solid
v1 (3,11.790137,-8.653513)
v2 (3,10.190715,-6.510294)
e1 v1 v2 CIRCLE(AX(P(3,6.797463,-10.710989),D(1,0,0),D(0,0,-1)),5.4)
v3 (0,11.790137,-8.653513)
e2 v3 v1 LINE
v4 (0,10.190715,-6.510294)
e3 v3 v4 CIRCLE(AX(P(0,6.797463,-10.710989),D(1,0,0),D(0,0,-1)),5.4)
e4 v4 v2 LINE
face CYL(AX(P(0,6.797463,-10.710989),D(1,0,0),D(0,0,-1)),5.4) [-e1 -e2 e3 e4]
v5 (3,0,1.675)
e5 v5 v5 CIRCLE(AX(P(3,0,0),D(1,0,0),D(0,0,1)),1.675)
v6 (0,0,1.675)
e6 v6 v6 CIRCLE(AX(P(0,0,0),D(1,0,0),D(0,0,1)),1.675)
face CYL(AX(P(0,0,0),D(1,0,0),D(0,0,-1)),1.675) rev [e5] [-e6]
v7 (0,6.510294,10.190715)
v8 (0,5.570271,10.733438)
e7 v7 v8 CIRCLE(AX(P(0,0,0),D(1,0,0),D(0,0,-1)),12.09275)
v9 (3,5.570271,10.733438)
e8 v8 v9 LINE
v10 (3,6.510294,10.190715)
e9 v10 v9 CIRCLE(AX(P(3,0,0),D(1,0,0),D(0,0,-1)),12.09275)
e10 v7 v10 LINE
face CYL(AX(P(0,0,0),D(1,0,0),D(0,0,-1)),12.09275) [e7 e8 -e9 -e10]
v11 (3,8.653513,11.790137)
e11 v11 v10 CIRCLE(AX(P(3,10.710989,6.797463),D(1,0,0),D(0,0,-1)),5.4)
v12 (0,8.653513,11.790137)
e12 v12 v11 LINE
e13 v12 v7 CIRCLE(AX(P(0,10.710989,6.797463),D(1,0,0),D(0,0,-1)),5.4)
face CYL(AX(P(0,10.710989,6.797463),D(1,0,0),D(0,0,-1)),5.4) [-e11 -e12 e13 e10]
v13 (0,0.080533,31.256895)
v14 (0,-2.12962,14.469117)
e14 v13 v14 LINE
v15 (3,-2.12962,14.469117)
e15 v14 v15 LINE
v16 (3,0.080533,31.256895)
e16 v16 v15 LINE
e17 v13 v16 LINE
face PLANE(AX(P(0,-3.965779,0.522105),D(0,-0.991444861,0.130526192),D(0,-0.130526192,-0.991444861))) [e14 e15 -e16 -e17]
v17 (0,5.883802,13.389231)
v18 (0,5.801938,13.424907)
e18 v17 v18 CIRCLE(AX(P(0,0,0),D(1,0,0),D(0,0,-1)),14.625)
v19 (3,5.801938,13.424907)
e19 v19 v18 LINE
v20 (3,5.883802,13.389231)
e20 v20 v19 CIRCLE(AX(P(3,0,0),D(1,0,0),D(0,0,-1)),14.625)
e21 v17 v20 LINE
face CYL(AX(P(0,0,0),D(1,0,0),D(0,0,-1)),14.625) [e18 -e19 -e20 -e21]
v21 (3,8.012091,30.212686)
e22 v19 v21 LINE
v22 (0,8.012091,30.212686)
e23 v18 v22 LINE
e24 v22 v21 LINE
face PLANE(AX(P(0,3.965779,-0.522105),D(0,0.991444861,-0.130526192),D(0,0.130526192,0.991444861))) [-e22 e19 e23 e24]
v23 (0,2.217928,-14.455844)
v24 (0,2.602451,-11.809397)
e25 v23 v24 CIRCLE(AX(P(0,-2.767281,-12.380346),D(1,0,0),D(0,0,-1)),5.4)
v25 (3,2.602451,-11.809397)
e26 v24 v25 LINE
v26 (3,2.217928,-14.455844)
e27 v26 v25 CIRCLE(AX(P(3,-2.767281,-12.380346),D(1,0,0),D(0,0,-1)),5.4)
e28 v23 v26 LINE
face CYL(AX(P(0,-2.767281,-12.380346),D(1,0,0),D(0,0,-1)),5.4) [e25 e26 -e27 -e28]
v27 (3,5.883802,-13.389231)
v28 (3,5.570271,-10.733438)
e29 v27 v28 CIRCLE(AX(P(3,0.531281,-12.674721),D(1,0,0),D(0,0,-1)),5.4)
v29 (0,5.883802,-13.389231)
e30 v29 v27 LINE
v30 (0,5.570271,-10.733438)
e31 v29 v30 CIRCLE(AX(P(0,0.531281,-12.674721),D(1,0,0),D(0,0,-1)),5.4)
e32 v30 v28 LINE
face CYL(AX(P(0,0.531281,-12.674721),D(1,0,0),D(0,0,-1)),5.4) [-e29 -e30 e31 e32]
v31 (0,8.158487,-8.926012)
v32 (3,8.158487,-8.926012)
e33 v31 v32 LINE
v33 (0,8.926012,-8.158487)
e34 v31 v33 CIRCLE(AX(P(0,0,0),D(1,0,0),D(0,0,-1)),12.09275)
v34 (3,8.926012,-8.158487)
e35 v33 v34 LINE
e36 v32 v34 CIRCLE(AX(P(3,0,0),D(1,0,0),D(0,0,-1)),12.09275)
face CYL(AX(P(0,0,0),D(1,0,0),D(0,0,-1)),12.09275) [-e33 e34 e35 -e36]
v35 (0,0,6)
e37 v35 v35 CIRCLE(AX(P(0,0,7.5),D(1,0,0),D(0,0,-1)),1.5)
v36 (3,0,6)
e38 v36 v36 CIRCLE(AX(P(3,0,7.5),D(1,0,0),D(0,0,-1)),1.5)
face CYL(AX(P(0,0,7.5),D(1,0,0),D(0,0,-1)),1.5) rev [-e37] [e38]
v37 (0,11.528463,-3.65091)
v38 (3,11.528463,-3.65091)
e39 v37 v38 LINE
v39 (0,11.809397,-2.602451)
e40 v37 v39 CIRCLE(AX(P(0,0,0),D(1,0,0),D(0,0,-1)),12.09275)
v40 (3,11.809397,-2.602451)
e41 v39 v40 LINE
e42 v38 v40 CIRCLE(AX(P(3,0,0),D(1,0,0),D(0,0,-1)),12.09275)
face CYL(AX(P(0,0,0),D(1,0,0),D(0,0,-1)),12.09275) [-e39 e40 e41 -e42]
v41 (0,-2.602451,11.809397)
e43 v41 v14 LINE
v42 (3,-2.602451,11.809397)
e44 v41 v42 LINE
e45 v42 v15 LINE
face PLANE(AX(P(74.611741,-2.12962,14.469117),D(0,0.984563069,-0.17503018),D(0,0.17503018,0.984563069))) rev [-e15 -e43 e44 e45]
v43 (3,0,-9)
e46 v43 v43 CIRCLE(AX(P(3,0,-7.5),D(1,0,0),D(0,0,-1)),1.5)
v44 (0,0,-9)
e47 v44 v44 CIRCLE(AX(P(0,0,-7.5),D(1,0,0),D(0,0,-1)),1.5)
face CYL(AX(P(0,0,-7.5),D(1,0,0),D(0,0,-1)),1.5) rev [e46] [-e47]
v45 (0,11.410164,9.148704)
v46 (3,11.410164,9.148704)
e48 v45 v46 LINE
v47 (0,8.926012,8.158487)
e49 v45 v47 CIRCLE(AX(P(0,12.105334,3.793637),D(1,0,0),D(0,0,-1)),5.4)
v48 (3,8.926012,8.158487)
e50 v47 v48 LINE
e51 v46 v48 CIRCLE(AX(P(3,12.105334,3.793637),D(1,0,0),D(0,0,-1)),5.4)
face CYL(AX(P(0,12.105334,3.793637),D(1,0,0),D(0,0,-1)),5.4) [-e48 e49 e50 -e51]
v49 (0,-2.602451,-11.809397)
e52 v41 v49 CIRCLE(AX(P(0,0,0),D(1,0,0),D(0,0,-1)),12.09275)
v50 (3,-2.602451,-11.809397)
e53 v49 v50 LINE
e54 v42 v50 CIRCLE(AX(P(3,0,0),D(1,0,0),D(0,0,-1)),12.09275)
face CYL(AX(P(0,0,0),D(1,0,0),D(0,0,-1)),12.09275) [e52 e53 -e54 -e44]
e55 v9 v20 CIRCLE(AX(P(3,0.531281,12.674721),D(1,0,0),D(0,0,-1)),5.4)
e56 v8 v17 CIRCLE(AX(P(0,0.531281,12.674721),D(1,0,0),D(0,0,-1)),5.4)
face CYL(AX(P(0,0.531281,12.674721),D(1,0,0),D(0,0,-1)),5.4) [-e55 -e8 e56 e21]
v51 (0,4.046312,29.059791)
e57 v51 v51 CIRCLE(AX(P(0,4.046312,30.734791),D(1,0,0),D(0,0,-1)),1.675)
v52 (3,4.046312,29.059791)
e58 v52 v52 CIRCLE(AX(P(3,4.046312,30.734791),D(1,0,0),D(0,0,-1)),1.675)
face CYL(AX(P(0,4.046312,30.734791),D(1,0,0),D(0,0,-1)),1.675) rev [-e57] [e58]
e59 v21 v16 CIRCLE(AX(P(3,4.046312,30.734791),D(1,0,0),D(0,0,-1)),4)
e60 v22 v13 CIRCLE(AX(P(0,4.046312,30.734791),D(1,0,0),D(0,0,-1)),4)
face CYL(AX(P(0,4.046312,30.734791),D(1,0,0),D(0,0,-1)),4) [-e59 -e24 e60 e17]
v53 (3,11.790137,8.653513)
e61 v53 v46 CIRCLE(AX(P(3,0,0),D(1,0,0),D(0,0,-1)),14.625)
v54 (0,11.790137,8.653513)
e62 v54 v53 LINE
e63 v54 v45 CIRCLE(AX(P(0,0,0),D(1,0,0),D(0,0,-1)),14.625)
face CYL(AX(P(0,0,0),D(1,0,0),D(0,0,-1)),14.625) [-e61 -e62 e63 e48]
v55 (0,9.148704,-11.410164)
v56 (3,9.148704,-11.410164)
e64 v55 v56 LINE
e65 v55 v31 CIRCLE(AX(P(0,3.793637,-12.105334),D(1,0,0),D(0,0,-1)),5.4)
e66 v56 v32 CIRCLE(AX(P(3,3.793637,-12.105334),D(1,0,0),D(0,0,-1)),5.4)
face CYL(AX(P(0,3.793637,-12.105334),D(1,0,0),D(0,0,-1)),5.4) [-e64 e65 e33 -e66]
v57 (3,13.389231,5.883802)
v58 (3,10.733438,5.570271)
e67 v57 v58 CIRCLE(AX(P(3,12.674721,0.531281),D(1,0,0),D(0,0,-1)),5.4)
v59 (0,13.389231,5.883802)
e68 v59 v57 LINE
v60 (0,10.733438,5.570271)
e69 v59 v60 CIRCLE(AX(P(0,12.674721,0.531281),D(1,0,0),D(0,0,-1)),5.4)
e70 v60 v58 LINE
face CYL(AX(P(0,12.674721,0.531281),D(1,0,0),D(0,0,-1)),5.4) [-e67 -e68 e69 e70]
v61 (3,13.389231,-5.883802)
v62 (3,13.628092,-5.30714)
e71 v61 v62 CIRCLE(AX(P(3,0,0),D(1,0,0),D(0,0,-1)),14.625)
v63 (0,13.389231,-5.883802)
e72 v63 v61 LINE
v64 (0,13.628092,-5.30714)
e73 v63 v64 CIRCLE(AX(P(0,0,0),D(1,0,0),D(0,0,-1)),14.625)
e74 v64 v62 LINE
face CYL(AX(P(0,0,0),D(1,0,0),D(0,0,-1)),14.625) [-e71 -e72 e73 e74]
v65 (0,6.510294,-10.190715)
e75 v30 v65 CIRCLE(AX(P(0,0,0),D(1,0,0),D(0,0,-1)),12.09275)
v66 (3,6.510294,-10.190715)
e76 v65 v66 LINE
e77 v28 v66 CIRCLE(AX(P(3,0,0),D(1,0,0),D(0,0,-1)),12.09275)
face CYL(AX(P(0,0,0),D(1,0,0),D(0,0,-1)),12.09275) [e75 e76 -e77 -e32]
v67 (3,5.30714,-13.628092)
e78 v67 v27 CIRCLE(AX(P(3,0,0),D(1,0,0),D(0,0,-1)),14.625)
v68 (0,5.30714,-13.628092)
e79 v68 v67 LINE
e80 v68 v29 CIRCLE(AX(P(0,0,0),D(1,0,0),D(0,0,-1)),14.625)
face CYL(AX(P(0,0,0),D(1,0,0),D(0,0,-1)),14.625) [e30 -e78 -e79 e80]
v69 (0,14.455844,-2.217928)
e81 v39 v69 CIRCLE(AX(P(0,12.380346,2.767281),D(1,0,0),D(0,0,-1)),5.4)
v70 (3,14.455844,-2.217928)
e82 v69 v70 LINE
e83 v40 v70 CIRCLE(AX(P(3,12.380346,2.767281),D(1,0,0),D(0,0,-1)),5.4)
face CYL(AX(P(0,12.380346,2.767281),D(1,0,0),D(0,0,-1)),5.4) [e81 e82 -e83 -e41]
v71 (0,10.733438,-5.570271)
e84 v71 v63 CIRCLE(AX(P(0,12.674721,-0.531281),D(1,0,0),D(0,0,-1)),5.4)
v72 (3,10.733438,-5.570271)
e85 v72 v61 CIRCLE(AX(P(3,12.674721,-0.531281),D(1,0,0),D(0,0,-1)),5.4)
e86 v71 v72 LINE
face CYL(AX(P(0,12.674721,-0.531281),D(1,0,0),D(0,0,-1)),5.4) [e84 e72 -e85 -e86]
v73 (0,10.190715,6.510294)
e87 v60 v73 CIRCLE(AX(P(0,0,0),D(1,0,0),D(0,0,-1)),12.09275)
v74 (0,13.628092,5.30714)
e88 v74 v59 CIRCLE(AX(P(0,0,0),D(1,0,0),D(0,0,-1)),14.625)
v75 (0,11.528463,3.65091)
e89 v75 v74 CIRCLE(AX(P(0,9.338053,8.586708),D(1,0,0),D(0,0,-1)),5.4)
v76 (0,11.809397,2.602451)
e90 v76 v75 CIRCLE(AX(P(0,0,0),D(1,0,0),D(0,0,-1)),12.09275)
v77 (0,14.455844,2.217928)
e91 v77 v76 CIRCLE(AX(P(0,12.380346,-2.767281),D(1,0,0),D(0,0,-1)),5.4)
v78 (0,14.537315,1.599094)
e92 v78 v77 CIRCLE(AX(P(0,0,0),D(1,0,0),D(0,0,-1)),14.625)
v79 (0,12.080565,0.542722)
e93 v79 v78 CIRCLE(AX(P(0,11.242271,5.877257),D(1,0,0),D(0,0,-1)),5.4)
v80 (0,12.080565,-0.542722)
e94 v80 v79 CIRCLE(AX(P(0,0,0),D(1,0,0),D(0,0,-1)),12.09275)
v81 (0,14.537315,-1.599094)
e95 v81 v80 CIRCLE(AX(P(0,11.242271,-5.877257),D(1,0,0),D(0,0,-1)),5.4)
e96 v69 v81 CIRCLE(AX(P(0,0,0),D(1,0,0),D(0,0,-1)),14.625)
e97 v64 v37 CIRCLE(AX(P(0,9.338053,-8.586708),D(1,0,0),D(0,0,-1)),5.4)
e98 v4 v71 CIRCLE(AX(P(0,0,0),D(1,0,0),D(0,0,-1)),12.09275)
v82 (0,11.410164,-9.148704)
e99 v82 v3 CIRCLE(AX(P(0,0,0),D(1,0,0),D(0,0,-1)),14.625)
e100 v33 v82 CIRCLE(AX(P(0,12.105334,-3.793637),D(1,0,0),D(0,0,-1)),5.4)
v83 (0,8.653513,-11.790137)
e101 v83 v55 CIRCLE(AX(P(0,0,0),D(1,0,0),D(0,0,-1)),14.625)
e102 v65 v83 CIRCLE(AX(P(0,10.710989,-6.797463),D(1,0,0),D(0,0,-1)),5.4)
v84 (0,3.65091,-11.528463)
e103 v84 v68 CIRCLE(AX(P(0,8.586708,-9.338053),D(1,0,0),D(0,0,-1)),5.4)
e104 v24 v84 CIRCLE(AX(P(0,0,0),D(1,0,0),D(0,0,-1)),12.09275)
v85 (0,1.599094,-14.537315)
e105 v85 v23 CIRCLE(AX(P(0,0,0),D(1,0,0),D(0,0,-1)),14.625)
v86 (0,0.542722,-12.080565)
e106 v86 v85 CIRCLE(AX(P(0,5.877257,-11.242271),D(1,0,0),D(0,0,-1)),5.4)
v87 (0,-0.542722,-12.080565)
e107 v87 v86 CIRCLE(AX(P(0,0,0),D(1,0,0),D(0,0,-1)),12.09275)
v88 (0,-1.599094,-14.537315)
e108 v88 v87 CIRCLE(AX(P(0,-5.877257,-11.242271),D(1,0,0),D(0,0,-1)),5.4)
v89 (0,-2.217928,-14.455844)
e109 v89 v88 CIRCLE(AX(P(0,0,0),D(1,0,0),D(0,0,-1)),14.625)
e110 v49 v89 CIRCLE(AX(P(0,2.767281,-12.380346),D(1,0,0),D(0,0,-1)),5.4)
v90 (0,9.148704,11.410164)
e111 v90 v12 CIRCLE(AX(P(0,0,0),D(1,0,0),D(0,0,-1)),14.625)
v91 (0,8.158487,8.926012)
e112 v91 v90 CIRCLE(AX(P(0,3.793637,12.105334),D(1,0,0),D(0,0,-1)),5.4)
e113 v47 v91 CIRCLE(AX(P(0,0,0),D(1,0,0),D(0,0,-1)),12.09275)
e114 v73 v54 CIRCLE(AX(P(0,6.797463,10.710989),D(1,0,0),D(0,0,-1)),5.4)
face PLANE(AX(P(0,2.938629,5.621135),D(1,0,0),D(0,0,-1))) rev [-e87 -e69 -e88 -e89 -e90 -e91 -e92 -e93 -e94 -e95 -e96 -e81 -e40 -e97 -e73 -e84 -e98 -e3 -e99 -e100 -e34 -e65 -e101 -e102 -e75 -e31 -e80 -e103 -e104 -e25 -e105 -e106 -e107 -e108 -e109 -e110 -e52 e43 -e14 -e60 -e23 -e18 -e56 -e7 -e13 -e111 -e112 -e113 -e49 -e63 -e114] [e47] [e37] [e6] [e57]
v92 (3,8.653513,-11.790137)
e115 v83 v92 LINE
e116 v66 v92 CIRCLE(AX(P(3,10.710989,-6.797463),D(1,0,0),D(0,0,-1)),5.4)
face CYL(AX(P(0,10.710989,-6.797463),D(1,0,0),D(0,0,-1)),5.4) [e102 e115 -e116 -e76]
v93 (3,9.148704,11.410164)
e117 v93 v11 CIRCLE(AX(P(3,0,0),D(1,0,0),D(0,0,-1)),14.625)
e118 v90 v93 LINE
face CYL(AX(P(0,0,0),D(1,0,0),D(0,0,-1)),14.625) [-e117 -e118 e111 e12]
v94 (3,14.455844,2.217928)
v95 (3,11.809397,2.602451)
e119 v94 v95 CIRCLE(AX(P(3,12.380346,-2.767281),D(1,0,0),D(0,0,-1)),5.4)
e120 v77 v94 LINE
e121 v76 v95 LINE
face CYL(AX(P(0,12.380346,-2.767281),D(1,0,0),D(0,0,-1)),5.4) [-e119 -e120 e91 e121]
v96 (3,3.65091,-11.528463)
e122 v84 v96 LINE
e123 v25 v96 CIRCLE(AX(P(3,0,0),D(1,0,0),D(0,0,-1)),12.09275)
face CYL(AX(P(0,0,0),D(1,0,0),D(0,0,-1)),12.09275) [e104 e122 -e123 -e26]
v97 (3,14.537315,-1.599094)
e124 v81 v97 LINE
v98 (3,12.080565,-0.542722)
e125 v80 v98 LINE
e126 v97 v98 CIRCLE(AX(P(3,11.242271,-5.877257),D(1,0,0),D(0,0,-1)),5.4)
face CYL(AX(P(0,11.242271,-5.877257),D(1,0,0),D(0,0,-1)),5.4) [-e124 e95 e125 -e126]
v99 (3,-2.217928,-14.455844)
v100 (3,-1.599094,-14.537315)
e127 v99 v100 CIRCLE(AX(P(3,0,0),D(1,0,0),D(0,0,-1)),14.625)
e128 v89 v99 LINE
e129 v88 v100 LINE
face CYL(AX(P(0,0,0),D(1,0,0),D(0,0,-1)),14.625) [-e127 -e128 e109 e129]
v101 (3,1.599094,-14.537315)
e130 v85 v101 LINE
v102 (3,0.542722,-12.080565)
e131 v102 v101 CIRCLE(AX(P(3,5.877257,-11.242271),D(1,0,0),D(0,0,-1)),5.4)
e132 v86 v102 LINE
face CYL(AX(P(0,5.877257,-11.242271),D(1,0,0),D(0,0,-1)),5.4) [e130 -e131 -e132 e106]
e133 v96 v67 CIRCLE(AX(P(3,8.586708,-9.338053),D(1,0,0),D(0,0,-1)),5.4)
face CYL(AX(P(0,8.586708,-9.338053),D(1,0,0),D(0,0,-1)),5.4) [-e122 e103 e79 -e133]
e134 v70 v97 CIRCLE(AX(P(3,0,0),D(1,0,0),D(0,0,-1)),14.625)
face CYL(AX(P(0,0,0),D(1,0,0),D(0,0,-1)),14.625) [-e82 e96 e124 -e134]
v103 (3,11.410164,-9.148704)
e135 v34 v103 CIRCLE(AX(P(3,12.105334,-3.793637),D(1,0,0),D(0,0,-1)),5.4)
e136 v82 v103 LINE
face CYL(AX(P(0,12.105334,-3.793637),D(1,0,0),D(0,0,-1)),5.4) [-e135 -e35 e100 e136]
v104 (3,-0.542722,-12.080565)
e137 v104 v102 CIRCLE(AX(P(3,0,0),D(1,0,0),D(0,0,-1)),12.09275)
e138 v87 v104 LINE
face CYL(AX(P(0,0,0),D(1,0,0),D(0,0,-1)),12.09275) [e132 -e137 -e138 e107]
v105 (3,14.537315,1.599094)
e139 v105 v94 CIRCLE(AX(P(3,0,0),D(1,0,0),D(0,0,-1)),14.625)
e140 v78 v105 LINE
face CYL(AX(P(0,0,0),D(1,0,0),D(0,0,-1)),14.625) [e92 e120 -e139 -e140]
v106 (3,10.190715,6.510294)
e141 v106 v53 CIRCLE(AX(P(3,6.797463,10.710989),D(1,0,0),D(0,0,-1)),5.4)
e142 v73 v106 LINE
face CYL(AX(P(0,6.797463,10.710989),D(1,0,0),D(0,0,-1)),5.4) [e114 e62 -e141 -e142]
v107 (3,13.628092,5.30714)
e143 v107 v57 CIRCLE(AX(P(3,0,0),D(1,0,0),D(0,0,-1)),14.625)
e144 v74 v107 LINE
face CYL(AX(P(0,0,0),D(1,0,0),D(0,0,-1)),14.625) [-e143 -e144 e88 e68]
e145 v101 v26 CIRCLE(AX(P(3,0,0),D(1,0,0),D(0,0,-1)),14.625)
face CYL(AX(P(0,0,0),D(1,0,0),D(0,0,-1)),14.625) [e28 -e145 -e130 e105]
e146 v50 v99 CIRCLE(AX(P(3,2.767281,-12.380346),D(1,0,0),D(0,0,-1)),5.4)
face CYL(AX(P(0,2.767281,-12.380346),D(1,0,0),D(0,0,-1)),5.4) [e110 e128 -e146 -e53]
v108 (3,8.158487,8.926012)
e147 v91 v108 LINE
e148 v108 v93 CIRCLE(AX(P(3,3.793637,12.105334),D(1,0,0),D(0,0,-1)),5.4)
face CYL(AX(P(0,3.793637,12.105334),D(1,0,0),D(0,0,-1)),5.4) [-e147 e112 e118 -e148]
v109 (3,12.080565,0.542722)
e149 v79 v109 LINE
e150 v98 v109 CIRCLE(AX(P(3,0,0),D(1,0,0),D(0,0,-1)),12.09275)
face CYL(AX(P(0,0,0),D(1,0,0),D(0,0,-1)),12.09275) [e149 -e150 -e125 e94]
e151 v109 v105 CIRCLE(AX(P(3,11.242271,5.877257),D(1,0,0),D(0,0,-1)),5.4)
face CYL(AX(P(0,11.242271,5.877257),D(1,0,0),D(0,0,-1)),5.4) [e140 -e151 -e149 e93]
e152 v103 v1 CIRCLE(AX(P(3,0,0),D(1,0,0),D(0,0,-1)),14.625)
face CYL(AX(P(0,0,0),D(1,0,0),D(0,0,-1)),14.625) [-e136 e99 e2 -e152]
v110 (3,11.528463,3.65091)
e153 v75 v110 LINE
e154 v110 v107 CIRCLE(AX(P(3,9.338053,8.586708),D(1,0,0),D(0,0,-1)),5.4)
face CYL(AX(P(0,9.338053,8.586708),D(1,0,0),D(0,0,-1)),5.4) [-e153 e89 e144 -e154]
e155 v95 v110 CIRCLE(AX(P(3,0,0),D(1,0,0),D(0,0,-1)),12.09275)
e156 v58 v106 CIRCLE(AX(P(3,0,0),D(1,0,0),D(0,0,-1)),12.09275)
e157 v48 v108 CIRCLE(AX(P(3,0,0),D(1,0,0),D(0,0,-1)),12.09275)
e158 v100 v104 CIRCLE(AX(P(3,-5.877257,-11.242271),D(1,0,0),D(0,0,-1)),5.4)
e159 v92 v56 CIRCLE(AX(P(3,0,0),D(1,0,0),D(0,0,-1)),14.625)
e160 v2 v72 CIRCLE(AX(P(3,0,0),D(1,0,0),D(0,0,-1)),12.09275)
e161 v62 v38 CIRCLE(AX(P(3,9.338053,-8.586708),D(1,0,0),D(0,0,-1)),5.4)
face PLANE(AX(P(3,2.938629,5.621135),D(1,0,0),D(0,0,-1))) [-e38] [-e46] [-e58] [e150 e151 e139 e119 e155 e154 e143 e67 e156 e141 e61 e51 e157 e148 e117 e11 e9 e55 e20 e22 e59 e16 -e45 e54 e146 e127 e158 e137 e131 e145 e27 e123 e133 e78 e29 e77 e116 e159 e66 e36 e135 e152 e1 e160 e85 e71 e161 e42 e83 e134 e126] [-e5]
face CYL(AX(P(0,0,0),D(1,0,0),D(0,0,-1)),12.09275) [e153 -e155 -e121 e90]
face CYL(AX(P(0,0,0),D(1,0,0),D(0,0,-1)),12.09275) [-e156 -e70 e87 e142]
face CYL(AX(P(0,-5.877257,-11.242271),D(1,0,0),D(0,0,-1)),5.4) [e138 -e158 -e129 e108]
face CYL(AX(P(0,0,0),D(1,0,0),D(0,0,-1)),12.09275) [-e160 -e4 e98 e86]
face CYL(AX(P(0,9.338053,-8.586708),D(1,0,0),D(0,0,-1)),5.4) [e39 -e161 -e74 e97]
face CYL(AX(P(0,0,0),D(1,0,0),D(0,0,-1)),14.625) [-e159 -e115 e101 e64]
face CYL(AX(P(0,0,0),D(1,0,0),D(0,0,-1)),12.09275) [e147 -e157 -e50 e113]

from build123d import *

# Parameters (mm, degrees)
SKETCH1_R           = 1.675
BOSS_EXTRUDE1_DEPTH = 3
SKETCH2_R           = 1.675
BOSS_EXTRUDE2_DEPTH = 3
CUT_EXTRUDE1_START  = -3
CUT_EXTRUDE1_DEPTH  = 3
SKETCH4_R           = 1.5
CUT_EXTRUDE2_DEPTH  = 38.773525245


# Read off the part's stored shape, not the designer's step: Cut-Extrude1
with BuildPart() as part:
    # Sketch1 → Boss-Extrude1 (new body)
    with BuildSketch(Plane(origin=(3, 0, 0), x_dir=(0, 0, -1), z_dir=(1, 0, 0))):
        with BuildLine():
            ThreePointArc((-14.537314892, 1.599093719), (-13.375367565, 0.916420874), (-12.080565177, 0.542722358))
            ThreePointArc((-12.080565177, 0.542722358), (-12.09275, 0), (-12.080565177, -0.542722358))
            ThreePointArc((-12.080565177, -0.542722358), (-13.375367565, -0.916420874), (-14.537314892, -1.599093719))
            ThreePointArc((-14.537314892, -1.599093719), (-14.499881098, -1.908945561), (-14.455843809, -2.217928037))
            ThreePointArc((-14.455843809, -2.217928037), (-13.156800143, -2.576605271), (-11.809396783, -2.602450802))
            ThreePointArc((-11.809396783, -2.602450802), (-11.680699536, -3.129834008), (-11.528463019, -3.650909885))
            ThreePointArc((-11.528463019, -3.650909885), (-12.682425791, -4.346994451), (-13.62809199, -5.30713988))
            ThreePointArc((-13.62809199, -5.30713988), (-13.511738163, -5.596745198), (-13.389230859, -5.883801663))
            ThreePointArc((-13.389230859, -5.883801663), (-12.041618533, -5.894040025), (-10.733437515, -5.57027124))
            ThreePointArc((-10.733437515, -5.57027124), (-10.472628702, -6.046375), (-10.190715157, -6.510293938))
            ThreePointArc((-10.190715157, -6.510293938), (-11.125197659, -7.48132754), (-11.79013714, -8.65351323))
            ThreePointArc((-11.79013714, -8.65351323), (-11.602792602, -8.903135899), (-11.410163953, -9.148703928))
            ThreePointArc((-11.410163953, -9.148703928), (-10.105820521, -8.809805691), (-8.926012217, -8.158486898))
            ThreePointArc((-8.926012217, -8.158486898), (-8.550865528, -8.550865528), (-8.158486898, -8.926012217))
            ThreePointArc((-8.158486898, -8.926012217), (-8.809805691, -10.105820521), (-9.148703928, -11.410163953))
            ThreePointArc((-9.148703928, -11.410163953), (-8.903135899, -11.602792602), (-8.65351323, -11.79013714))
            ThreePointArc((-8.65351323, -11.79013714), (-7.48132754, -11.125197659), (-6.510293938, -10.190715157))
            ThreePointArc((-6.510293938, -10.190715157), (-6.046375, -10.472628702), (-5.57027124, -10.733437515))
            ThreePointArc((-5.57027124, -10.733437515), (-5.894040025, -12.041618533), (-5.883801663, -13.389230859))
            ThreePointArc((-5.883801663, -13.389230859), (-5.596745198, -13.511738163), (-5.30713988, -13.62809199))
            ThreePointArc((-5.30713988, -13.62809199), (-4.346994451, -12.682425791), (-3.650909885, -11.528463019))
            ThreePointArc((-3.650909885, -11.528463019), (-3.129834008, -11.680699536), (-2.602450802, -11.809396783))
            ThreePointArc((-2.602450802, -11.809396783), (-2.576605271, -13.156800143), (-2.217928037, -14.455843809))
            ThreePointArc((-2.217928037, -14.455843809), (-1.908945561, -14.499881098), (-1.599093719, -14.537314892))
            ThreePointArc((-1.599093719, -14.537314892), (-0.916420874, -13.375367565), (-0.542722358, -12.080565177))
            ThreePointArc((-0.542722358, -12.080565177), (0, -12.09275), (0.542722358, -12.080565177))
            ThreePointArc((0.542722358, -12.080565177), (0.916420874, -13.375367565), (1.599093719, -14.537314892))
            ThreePointArc((1.599093719, -14.537314892), (1.908945561, -14.499881098), (2.217928037, -14.455843809))
            ThreePointArc((2.217928037, -14.455843809), (2.576605271, -13.156800143), (2.602450802, -11.809396783))
            ThreePointArc((2.602450802, -11.809396783), (3.129834008, -11.680699536), (3.650909885, -11.528463019))
            ThreePointArc((3.650909885, -11.528463019), (4.346994451, -12.682425791), (5.30713988, -13.62809199))
            ThreePointArc((5.30713988, -13.62809199), (5.596745198, -13.511738163), (5.883801663, -13.389230859))
            ThreePointArc((5.883801663, -13.389230859), (5.894040025, -12.041618533), (5.57027124, -10.733437515))
            ThreePointArc((5.57027124, -10.733437515), (6.046375, -10.472628702), (6.510293938, -10.190715157))
            ThreePointArc((6.510293938, -10.190715157), (7.48132754, -11.125197659), (8.65351323, -11.79013714))
            ThreePointArc((8.65351323, -11.79013714), (8.903135899, -11.602792602), (9.148703928, -11.410163953))
            ThreePointArc((9.148703928, -11.410163953), (8.809805691, -10.105820521), (8.158486898, -8.926012217))
            ThreePointArc((8.158486898, -8.926012217), (8.550865528, -8.550865528), (8.926012217, -8.158486898))
            ThreePointArc((8.926012217, -8.158486898), (10.105820521, -8.809805691), (11.410163953, -9.148703928))
            ThreePointArc((11.410163953, -9.148703928), (11.602792602, -8.903135899), (11.79013714, -8.65351323))
            ThreePointArc((11.79013714, -8.65351323), (11.125197659, -7.48132754), (10.190715157, -6.510293938))
            ThreePointArc((10.190715157, -6.510293938), (10.472628702, -6.046375), (10.733437515, -5.57027124))
            ThreePointArc((10.733437515, -5.57027124), (12.041618533, -5.894040025), (13.389230859, -5.883801663))
            ThreePointArc((13.389230859, -5.883801663), (13.511738163, -5.596745198), (13.62809199, -5.30713988))
            ThreePointArc((13.62809199, -5.30713988), (12.682425791, -4.346994451), (11.528463019, -3.650909885))
            ThreePointArc((11.528463019, -3.650909885), (11.680699536, -3.129834008), (11.809396783, -2.602450802))
            ThreePointArc((11.809396783, -2.602450802), (13.156800143, -2.576605271), (14.455843809, -2.217928037))
            ThreePointArc((14.455843809, -2.217928037), (14.499881098, -1.908945561), (14.537314892, -1.599093719))
            ThreePointArc((14.537314892, -1.599093719), (13.375367565, -0.916420874), (12.080565177, -0.542722358))
            ThreePointArc((12.080565177, -0.542722358), (12.09275, 0), (12.080565177, 0.542722358))
            ThreePointArc((12.080565177, 0.542722358), (13.375367565, 0.916420874), (14.537314892, 1.599093719))
            ThreePointArc((14.537314892, 1.599093719), (14.499881098, 1.908945561), (14.455843809, 2.217928037))
            ThreePointArc((14.455843809, 2.217928037), (13.156800143, 2.576605271), (11.809396783, 2.602450802))
            ThreePointArc((11.809396783, 2.602450802), (11.680699536, 3.129834008), (11.528463019, 3.650909885))
            ThreePointArc((11.528463019, 3.650909885), (12.682425791, 4.346994451), (13.62809199, 5.30713988))
            ThreePointArc((13.62809199, 5.30713988), (13.511738163, 5.596745198), (13.389230859, 5.883801663))
            ThreePointArc((13.389230859, 5.883801663), (12.041618533, 5.894040025), (10.733437515, 5.57027124))
            ThreePointArc((10.733437515, 5.57027124), (10.472628702, 6.046375), (10.190715157, 6.510293938))
            ThreePointArc((10.190715157, 6.510293938), (11.125197659, 7.48132754), (11.79013714, 8.65351323))
            ThreePointArc((11.79013714, 8.65351323), (11.602792602, 8.903135899), (11.410163953, 9.148703928))
            ThreePointArc((11.410163953, 9.148703928), (10.105820521, 8.809805691), (8.926012217, 8.158486898))
            ThreePointArc((8.926012217, 8.158486898), (8.550865528, 8.550865528), (8.158486898, 8.926012217))
            ThreePointArc((8.158486898, 8.926012217), (8.809805691, 10.105820521), (9.148703928, 11.410163953))
            ThreePointArc((9.148703928, 11.410163953), (8.903135899, 11.602792602), (8.65351323, 11.79013714))
            ThreePointArc((8.65351323, 11.79013714), (7.48132754, 11.125197659), (6.510293938, 10.190715157))
            ThreePointArc((6.510293938, 10.190715157), (6.046375, 10.472628702), (5.57027124, 10.733437515))
            ThreePointArc((5.57027124, 10.733437515), (5.894040025, 12.041618533), (5.883801663, 13.389230859))
            ThreePointArc((5.883801663, 13.389230859), (5.596745198, 13.511738163), (5.30713988, 13.62809199))
            ThreePointArc((5.30713988, 13.62809199), (4.346994451, 12.682425791), (3.650909885, 11.528463019))
            ThreePointArc((3.650909885, 11.528463019), (3.129834008, 11.680699536), (2.602450802, 11.809396783))
            ThreePointArc((2.602450802, 11.809396783), (2.576605271, 13.156800143), (2.217928037, 14.455843809))
            ThreePointArc((2.217928037, 14.455843809), (1.908945561, 14.499881098), (1.599093719, 14.537314892))
            ThreePointArc((1.599093719, 14.537314892), (0.916420874, 13.375367565), (0.542722358, 12.080565177))
            ThreePointArc((0.542722358, 12.080565177), (0, 12.09275), (-0.542722358, 12.080565177))
            ThreePointArc((-0.542722358, 12.080565177), (-0.916420874, 13.375367565), (-1.599093719, 14.537314892))
            ThreePointArc((-1.599093719, 14.537314892), (-1.908945561, 14.499881098), (-2.217928037, 14.455843809))
            ThreePointArc((-2.217928037, 14.455843809), (-2.576605271, 13.156800143), (-2.602450802, 11.809396783))
            ThreePointArc((-2.602450802, 11.809396783), (-3.129834008, 11.680699536), (-3.650909885, 11.528463019))
            ThreePointArc((-3.650909885, 11.528463019), (-4.346994451, 12.682425791), (-5.30713988, 13.62809199))
            ThreePointArc((-5.30713988, 13.62809199), (-5.596745198, 13.511738163), (-5.883801663, 13.389230859))
            ThreePointArc((-5.883801663, 13.389230859), (-5.894040025, 12.041618533), (-5.57027124, 10.733437515))
            ThreePointArc((-5.57027124, 10.733437515), (-6.046375, 10.472628702), (-6.510293938, 10.190715157))
            ThreePointArc((-6.510293938, 10.190715157), (-7.48132754, 11.125197659), (-8.65351323, 11.79013714))
            ThreePointArc((-8.65351323, 11.79013714), (-8.903135899, 11.602792602), (-9.148703928, 11.410163953))
            ThreePointArc((-9.148703928, 11.410163953), (-8.809805691, 10.105820521), (-8.158486898, 8.926012217))
            ThreePointArc((-8.158486898, 8.926012217), (-8.550865528, 8.550865528), (-8.926012217, 8.158486898))
            ThreePointArc((-8.926012217, 8.158486898), (-10.105820521, 8.809805691), (-11.410163953, 9.148703928))
            ThreePointArc((-11.410163953, 9.148703928), (-11.602792602, 8.903135899), (-11.79013714, 8.65351323))
            ThreePointArc((-11.79013714, 8.65351323), (-11.125197659, 7.48132754), (-10.190715157, 6.510293938))
            ThreePointArc((-10.190715157, 6.510293938), (-10.472628702, 6.046375), (-10.733437515, 5.57027124))
            ThreePointArc((-10.733437515, 5.57027124), (-12.041618533, 5.894040025), (-13.389230859, 5.883801663))
            ThreePointArc((-13.389230859, 5.883801663), (-13.511738163, 5.596745198), (-13.62809199, 5.30713988))
            ThreePointArc((-13.62809199, 5.30713988), (-12.682425791, 4.346994451), (-11.528463019, 3.650909885))
            ThreePointArc((-11.528463019, 3.650909885), (-11.680699536, 3.129834008), (-11.809396783, 2.602450802))
            ThreePointArc((-11.809396783, 2.602450802), (-13.156800143, 2.576605271), (-14.455843809, 2.217928037))
            ThreePointArc((-14.455843809, 2.217928037), (-14.499881098, 1.908945561), (-14.537314892, 1.599093719))
        make_face()
        with Locations(Location((0, 0, 0), (0, 0, 180))):
            Circle(SKETCH1_R, mode=Mode.SUBTRACT)
    extrude(amount=-BOSS_EXTRUDE1_DEPTH)

    # Sketch2 → Boss-Extrude2 (add)
    with BuildSketch(Plane(origin=(3, 0, 0), x_dir=(0, 0, -1), z_dir=(1, 0, 0))):
        with BuildLine():
            Line((-0.522104769, -3.965779445), (-31.256895471, 0.080532513))
            ThreePointArc((-31.256895471, 0.080532513), (-34.700570148, 4.568416728), (-30.212685934, 8.012091404))
            Line((-30.212685934, 8.012091404), (0.522104769, 3.965779445))
            ThreePointArc((0.522104769, 3.965779445), (3.965779445, -0.522104769), (-0.522104769, -3.965779445))
        make_face()
        with Locations((-30.734790703, 4.046311959)):
            Circle(SKETCH2_R, mode=Mode.SUBTRACT)
        with Locations(Location((0, 0, 0), (0, 0, 180))):
            Circle(SKETCH2_R, mode=Mode.SUBTRACT)
    extrude(amount=-BOSS_EXTRUDE2_DEPTH)

    # Cut-Extrude1 outline → Cut-Extrude1 (cut)
    with BuildSketch(Plane(origin=(3, 0, 0), x_dir=(0, 0, -1), z_dir=(1, 0, 0)).offset(CUT_EXTRUDE1_START)):
        with BuildLine():
            ThreePointArc((-14.455843809, -2.217928037), (-13.156800143, -2.576605271), (-11.809396783, -2.602450802))
            Line((-11.809396783, -2.602450802), (-14.469116823, -2.129620475))
            ThreePointArc((-14.469116823, -2.129620475), (-14.462547716, -2.173784387), (-14.455843809, -2.217928037))
        make_face()
        with BuildLine():
            ThreePointArc((11.528463018, -3.650909885), (11.172244217, -4.627695076), (10.733437514, -5.57027124))
            ThreePointArc((10.733437514, -5.57027124), (12.041618534, -5.894040025), (13.389230859, -5.883801663))
            ThreePointArc((13.389230859, -5.883801663), (13.511738163, -5.596745198), (13.62809199, -5.30713988))
            ThreePointArc((13.62809199, -5.30713988), (12.682425791, -4.346994451), (11.528463018, -3.650909885))
        make_face()
        with BuildLine():
            ThreePointArc((10.190715157, -6.510293938), (9.593823606, -7.361599771), (8.926012217, -8.158486898))
            ThreePointArc((8.926012217, -8.158486898), (10.105820521, -8.809805691), (11.410163953, -9.148703928))
            ThreePointArc((11.410163953, -9.148703928), (11.602792602, -8.903135899), (11.79013714, -8.65351323))
            ThreePointArc((11.79013714, -8.65351323), (11.125197659, -7.48132754), (10.190715157, -6.510293938))
        make_face()
        with BuildLine():
            ThreePointArc((8.158486898, -8.926012217), (7.361599771, -9.593823606), (6.510293938, -10.190715157))
            ThreePointArc((6.510293938, -10.190715157), (7.48132754, -11.125197659), (8.65351323, -11.79013714))
            ThreePointArc((8.65351323, -11.79013714), (8.903135899, -11.602792602), (9.148703928, -11.410163953))
            ThreePointArc((9.148703928, -11.410163953), (8.809805691, -10.105820521), (8.158486898, -8.926012217))
        make_face()
        with BuildLine():
            ThreePointArc((5.57027124, -10.733437514), (4.627695077, -11.172244217), (3.650909885, -11.528463019))
            ThreePointArc((3.650909885, -11.528463019), (4.346994451, -12.682425791), (5.30713988, -13.62809199))
            ThreePointArc((5.30713988, -13.62809199), (5.596745198, -13.511738163), (5.883801663, -13.389230859))
            ThreePointArc((5.883801663, -13.389230859), (5.894040025, -12.041618534), (5.57027124, -10.733437514))
        make_face()
        with BuildLine():
            ThreePointArc((2.602450802, -11.809396783), (1.578420611, -11.989294847), (0.542722358, -12.080565177))
            ThreePointArc((0.542722358, -12.080565177), (0.916420874, -13.375367565), (1.599093719, -14.537314892))
            ThreePointArc((1.599093719, -14.537314892), (1.908945561, -14.499881098), (2.217928037, -14.455843809))
            ThreePointArc((2.217928037, -14.455843809), (2.576605271, -13.156800143), (2.602450802, -11.809396783))
        make_face()
        with BuildLine():
            ThreePointArc((-0.542722358, -12.080565177), (-1.578420611, -11.989294847), (-2.602450802, -11.809396783))
            ThreePointArc((-2.602450802, -11.809396783), (-2.576605271, -13.156800143), (-2.217928037, -14.455843809))
            ThreePointArc((-2.217928037, -14.455843809), (-1.908945561, -14.499881098), (-1.599093719, -14.537314892))
            ThreePointArc((-1.599093719, -14.537314892), (-0.916420874, -13.375367565), (-0.542722358, -12.080565177))
        make_face()
        with BuildLine():
            ThreePointArc((-3.650909885, -11.528463019), (-4.627695077, -11.172244217), (-5.57027124, -10.733437514))
            ThreePointArc((-5.57027124, -10.733437514), (-5.894040025, -12.041618534), (-5.883801663, -13.389230859))
            ThreePointArc((-5.883801663, -13.389230859), (-5.596745198, -13.511738163), (-5.30713988, -13.62809199))
            ThreePointArc((-5.30713988, -13.62809199), (-4.346994451, -12.682425791), (-3.650909885, -11.528463019))
        make_face()
        with BuildLine():
            ThreePointArc((-6.510293938, -10.190715157), (-7.361599771, -9.593823606), (-8.158486898, -8.926012217))
            ThreePointArc((-8.158486898, -8.926012217), (-8.809805691, -10.105820521), (-9.148703928, -11.410163953))
            ThreePointArc((-9.148703928, -11.410163953), (-8.903135899, -11.602792602), (-8.65351323, -11.79013714))
            ThreePointArc((-8.65351323, -11.79013714), (-7.48132754, -11.125197659), (-6.510293938, -10.190715157))
        make_face()
        with BuildLine():
            ThreePointArc((-8.926012217, -8.158486898), (-9.593823606, -7.361599771), (-10.190715157, -6.510293938))
            ThreePointArc((-10.190715157, -6.510293938), (-11.125197659, -7.48132754), (-11.79013714, -8.65351323))
            ThreePointArc((-11.79013714, -8.65351323), (-11.602792602, -8.903135899), (-11.410163953, -9.148703928))
            ThreePointArc((-11.410163953, -9.148703928), (-10.105820521, -8.809805691), (-8.926012217, -8.158486898))
        make_face()
        with BuildLine():
            ThreePointArc((-10.733437514, -5.57027124), (-11.172244217, -4.627695076), (-11.528463018, -3.650909885))
            ThreePointArc((-11.528463018, -3.650909885), (-12.682425791, -4.346994451), (-13.62809199, -5.30713988))
            ThreePointArc((-13.62809199, -5.30713988), (-13.511738163, -5.596745198), (-13.389230859, -5.883801663))
            ThreePointArc((-13.389230859, -5.883801663), (-12.041618534, -5.894040025), (-10.733437514, -5.57027124))
        make_face()
    extrude(amount=CUT_EXTRUDE1_DEPTH, mode=Mode.SUBTRACT)

    # Sketch4 → Cut-Extrude2 (cut, through all)
    with BuildSketch(Plane(origin=(3, 0, 0), x_dir=(0, 0, -1), z_dir=(1, 0, 0))):
        with Locations((-7.5, 0)):
            Circle(SKETCH4_R)
        with Locations((7.5, 0)):
            Circle(SKETCH4_R)
    extrude(amount=-CUT_EXTRUDE2_DEPTH, mode=Mode.SUBTRACT)


solid = part.part
